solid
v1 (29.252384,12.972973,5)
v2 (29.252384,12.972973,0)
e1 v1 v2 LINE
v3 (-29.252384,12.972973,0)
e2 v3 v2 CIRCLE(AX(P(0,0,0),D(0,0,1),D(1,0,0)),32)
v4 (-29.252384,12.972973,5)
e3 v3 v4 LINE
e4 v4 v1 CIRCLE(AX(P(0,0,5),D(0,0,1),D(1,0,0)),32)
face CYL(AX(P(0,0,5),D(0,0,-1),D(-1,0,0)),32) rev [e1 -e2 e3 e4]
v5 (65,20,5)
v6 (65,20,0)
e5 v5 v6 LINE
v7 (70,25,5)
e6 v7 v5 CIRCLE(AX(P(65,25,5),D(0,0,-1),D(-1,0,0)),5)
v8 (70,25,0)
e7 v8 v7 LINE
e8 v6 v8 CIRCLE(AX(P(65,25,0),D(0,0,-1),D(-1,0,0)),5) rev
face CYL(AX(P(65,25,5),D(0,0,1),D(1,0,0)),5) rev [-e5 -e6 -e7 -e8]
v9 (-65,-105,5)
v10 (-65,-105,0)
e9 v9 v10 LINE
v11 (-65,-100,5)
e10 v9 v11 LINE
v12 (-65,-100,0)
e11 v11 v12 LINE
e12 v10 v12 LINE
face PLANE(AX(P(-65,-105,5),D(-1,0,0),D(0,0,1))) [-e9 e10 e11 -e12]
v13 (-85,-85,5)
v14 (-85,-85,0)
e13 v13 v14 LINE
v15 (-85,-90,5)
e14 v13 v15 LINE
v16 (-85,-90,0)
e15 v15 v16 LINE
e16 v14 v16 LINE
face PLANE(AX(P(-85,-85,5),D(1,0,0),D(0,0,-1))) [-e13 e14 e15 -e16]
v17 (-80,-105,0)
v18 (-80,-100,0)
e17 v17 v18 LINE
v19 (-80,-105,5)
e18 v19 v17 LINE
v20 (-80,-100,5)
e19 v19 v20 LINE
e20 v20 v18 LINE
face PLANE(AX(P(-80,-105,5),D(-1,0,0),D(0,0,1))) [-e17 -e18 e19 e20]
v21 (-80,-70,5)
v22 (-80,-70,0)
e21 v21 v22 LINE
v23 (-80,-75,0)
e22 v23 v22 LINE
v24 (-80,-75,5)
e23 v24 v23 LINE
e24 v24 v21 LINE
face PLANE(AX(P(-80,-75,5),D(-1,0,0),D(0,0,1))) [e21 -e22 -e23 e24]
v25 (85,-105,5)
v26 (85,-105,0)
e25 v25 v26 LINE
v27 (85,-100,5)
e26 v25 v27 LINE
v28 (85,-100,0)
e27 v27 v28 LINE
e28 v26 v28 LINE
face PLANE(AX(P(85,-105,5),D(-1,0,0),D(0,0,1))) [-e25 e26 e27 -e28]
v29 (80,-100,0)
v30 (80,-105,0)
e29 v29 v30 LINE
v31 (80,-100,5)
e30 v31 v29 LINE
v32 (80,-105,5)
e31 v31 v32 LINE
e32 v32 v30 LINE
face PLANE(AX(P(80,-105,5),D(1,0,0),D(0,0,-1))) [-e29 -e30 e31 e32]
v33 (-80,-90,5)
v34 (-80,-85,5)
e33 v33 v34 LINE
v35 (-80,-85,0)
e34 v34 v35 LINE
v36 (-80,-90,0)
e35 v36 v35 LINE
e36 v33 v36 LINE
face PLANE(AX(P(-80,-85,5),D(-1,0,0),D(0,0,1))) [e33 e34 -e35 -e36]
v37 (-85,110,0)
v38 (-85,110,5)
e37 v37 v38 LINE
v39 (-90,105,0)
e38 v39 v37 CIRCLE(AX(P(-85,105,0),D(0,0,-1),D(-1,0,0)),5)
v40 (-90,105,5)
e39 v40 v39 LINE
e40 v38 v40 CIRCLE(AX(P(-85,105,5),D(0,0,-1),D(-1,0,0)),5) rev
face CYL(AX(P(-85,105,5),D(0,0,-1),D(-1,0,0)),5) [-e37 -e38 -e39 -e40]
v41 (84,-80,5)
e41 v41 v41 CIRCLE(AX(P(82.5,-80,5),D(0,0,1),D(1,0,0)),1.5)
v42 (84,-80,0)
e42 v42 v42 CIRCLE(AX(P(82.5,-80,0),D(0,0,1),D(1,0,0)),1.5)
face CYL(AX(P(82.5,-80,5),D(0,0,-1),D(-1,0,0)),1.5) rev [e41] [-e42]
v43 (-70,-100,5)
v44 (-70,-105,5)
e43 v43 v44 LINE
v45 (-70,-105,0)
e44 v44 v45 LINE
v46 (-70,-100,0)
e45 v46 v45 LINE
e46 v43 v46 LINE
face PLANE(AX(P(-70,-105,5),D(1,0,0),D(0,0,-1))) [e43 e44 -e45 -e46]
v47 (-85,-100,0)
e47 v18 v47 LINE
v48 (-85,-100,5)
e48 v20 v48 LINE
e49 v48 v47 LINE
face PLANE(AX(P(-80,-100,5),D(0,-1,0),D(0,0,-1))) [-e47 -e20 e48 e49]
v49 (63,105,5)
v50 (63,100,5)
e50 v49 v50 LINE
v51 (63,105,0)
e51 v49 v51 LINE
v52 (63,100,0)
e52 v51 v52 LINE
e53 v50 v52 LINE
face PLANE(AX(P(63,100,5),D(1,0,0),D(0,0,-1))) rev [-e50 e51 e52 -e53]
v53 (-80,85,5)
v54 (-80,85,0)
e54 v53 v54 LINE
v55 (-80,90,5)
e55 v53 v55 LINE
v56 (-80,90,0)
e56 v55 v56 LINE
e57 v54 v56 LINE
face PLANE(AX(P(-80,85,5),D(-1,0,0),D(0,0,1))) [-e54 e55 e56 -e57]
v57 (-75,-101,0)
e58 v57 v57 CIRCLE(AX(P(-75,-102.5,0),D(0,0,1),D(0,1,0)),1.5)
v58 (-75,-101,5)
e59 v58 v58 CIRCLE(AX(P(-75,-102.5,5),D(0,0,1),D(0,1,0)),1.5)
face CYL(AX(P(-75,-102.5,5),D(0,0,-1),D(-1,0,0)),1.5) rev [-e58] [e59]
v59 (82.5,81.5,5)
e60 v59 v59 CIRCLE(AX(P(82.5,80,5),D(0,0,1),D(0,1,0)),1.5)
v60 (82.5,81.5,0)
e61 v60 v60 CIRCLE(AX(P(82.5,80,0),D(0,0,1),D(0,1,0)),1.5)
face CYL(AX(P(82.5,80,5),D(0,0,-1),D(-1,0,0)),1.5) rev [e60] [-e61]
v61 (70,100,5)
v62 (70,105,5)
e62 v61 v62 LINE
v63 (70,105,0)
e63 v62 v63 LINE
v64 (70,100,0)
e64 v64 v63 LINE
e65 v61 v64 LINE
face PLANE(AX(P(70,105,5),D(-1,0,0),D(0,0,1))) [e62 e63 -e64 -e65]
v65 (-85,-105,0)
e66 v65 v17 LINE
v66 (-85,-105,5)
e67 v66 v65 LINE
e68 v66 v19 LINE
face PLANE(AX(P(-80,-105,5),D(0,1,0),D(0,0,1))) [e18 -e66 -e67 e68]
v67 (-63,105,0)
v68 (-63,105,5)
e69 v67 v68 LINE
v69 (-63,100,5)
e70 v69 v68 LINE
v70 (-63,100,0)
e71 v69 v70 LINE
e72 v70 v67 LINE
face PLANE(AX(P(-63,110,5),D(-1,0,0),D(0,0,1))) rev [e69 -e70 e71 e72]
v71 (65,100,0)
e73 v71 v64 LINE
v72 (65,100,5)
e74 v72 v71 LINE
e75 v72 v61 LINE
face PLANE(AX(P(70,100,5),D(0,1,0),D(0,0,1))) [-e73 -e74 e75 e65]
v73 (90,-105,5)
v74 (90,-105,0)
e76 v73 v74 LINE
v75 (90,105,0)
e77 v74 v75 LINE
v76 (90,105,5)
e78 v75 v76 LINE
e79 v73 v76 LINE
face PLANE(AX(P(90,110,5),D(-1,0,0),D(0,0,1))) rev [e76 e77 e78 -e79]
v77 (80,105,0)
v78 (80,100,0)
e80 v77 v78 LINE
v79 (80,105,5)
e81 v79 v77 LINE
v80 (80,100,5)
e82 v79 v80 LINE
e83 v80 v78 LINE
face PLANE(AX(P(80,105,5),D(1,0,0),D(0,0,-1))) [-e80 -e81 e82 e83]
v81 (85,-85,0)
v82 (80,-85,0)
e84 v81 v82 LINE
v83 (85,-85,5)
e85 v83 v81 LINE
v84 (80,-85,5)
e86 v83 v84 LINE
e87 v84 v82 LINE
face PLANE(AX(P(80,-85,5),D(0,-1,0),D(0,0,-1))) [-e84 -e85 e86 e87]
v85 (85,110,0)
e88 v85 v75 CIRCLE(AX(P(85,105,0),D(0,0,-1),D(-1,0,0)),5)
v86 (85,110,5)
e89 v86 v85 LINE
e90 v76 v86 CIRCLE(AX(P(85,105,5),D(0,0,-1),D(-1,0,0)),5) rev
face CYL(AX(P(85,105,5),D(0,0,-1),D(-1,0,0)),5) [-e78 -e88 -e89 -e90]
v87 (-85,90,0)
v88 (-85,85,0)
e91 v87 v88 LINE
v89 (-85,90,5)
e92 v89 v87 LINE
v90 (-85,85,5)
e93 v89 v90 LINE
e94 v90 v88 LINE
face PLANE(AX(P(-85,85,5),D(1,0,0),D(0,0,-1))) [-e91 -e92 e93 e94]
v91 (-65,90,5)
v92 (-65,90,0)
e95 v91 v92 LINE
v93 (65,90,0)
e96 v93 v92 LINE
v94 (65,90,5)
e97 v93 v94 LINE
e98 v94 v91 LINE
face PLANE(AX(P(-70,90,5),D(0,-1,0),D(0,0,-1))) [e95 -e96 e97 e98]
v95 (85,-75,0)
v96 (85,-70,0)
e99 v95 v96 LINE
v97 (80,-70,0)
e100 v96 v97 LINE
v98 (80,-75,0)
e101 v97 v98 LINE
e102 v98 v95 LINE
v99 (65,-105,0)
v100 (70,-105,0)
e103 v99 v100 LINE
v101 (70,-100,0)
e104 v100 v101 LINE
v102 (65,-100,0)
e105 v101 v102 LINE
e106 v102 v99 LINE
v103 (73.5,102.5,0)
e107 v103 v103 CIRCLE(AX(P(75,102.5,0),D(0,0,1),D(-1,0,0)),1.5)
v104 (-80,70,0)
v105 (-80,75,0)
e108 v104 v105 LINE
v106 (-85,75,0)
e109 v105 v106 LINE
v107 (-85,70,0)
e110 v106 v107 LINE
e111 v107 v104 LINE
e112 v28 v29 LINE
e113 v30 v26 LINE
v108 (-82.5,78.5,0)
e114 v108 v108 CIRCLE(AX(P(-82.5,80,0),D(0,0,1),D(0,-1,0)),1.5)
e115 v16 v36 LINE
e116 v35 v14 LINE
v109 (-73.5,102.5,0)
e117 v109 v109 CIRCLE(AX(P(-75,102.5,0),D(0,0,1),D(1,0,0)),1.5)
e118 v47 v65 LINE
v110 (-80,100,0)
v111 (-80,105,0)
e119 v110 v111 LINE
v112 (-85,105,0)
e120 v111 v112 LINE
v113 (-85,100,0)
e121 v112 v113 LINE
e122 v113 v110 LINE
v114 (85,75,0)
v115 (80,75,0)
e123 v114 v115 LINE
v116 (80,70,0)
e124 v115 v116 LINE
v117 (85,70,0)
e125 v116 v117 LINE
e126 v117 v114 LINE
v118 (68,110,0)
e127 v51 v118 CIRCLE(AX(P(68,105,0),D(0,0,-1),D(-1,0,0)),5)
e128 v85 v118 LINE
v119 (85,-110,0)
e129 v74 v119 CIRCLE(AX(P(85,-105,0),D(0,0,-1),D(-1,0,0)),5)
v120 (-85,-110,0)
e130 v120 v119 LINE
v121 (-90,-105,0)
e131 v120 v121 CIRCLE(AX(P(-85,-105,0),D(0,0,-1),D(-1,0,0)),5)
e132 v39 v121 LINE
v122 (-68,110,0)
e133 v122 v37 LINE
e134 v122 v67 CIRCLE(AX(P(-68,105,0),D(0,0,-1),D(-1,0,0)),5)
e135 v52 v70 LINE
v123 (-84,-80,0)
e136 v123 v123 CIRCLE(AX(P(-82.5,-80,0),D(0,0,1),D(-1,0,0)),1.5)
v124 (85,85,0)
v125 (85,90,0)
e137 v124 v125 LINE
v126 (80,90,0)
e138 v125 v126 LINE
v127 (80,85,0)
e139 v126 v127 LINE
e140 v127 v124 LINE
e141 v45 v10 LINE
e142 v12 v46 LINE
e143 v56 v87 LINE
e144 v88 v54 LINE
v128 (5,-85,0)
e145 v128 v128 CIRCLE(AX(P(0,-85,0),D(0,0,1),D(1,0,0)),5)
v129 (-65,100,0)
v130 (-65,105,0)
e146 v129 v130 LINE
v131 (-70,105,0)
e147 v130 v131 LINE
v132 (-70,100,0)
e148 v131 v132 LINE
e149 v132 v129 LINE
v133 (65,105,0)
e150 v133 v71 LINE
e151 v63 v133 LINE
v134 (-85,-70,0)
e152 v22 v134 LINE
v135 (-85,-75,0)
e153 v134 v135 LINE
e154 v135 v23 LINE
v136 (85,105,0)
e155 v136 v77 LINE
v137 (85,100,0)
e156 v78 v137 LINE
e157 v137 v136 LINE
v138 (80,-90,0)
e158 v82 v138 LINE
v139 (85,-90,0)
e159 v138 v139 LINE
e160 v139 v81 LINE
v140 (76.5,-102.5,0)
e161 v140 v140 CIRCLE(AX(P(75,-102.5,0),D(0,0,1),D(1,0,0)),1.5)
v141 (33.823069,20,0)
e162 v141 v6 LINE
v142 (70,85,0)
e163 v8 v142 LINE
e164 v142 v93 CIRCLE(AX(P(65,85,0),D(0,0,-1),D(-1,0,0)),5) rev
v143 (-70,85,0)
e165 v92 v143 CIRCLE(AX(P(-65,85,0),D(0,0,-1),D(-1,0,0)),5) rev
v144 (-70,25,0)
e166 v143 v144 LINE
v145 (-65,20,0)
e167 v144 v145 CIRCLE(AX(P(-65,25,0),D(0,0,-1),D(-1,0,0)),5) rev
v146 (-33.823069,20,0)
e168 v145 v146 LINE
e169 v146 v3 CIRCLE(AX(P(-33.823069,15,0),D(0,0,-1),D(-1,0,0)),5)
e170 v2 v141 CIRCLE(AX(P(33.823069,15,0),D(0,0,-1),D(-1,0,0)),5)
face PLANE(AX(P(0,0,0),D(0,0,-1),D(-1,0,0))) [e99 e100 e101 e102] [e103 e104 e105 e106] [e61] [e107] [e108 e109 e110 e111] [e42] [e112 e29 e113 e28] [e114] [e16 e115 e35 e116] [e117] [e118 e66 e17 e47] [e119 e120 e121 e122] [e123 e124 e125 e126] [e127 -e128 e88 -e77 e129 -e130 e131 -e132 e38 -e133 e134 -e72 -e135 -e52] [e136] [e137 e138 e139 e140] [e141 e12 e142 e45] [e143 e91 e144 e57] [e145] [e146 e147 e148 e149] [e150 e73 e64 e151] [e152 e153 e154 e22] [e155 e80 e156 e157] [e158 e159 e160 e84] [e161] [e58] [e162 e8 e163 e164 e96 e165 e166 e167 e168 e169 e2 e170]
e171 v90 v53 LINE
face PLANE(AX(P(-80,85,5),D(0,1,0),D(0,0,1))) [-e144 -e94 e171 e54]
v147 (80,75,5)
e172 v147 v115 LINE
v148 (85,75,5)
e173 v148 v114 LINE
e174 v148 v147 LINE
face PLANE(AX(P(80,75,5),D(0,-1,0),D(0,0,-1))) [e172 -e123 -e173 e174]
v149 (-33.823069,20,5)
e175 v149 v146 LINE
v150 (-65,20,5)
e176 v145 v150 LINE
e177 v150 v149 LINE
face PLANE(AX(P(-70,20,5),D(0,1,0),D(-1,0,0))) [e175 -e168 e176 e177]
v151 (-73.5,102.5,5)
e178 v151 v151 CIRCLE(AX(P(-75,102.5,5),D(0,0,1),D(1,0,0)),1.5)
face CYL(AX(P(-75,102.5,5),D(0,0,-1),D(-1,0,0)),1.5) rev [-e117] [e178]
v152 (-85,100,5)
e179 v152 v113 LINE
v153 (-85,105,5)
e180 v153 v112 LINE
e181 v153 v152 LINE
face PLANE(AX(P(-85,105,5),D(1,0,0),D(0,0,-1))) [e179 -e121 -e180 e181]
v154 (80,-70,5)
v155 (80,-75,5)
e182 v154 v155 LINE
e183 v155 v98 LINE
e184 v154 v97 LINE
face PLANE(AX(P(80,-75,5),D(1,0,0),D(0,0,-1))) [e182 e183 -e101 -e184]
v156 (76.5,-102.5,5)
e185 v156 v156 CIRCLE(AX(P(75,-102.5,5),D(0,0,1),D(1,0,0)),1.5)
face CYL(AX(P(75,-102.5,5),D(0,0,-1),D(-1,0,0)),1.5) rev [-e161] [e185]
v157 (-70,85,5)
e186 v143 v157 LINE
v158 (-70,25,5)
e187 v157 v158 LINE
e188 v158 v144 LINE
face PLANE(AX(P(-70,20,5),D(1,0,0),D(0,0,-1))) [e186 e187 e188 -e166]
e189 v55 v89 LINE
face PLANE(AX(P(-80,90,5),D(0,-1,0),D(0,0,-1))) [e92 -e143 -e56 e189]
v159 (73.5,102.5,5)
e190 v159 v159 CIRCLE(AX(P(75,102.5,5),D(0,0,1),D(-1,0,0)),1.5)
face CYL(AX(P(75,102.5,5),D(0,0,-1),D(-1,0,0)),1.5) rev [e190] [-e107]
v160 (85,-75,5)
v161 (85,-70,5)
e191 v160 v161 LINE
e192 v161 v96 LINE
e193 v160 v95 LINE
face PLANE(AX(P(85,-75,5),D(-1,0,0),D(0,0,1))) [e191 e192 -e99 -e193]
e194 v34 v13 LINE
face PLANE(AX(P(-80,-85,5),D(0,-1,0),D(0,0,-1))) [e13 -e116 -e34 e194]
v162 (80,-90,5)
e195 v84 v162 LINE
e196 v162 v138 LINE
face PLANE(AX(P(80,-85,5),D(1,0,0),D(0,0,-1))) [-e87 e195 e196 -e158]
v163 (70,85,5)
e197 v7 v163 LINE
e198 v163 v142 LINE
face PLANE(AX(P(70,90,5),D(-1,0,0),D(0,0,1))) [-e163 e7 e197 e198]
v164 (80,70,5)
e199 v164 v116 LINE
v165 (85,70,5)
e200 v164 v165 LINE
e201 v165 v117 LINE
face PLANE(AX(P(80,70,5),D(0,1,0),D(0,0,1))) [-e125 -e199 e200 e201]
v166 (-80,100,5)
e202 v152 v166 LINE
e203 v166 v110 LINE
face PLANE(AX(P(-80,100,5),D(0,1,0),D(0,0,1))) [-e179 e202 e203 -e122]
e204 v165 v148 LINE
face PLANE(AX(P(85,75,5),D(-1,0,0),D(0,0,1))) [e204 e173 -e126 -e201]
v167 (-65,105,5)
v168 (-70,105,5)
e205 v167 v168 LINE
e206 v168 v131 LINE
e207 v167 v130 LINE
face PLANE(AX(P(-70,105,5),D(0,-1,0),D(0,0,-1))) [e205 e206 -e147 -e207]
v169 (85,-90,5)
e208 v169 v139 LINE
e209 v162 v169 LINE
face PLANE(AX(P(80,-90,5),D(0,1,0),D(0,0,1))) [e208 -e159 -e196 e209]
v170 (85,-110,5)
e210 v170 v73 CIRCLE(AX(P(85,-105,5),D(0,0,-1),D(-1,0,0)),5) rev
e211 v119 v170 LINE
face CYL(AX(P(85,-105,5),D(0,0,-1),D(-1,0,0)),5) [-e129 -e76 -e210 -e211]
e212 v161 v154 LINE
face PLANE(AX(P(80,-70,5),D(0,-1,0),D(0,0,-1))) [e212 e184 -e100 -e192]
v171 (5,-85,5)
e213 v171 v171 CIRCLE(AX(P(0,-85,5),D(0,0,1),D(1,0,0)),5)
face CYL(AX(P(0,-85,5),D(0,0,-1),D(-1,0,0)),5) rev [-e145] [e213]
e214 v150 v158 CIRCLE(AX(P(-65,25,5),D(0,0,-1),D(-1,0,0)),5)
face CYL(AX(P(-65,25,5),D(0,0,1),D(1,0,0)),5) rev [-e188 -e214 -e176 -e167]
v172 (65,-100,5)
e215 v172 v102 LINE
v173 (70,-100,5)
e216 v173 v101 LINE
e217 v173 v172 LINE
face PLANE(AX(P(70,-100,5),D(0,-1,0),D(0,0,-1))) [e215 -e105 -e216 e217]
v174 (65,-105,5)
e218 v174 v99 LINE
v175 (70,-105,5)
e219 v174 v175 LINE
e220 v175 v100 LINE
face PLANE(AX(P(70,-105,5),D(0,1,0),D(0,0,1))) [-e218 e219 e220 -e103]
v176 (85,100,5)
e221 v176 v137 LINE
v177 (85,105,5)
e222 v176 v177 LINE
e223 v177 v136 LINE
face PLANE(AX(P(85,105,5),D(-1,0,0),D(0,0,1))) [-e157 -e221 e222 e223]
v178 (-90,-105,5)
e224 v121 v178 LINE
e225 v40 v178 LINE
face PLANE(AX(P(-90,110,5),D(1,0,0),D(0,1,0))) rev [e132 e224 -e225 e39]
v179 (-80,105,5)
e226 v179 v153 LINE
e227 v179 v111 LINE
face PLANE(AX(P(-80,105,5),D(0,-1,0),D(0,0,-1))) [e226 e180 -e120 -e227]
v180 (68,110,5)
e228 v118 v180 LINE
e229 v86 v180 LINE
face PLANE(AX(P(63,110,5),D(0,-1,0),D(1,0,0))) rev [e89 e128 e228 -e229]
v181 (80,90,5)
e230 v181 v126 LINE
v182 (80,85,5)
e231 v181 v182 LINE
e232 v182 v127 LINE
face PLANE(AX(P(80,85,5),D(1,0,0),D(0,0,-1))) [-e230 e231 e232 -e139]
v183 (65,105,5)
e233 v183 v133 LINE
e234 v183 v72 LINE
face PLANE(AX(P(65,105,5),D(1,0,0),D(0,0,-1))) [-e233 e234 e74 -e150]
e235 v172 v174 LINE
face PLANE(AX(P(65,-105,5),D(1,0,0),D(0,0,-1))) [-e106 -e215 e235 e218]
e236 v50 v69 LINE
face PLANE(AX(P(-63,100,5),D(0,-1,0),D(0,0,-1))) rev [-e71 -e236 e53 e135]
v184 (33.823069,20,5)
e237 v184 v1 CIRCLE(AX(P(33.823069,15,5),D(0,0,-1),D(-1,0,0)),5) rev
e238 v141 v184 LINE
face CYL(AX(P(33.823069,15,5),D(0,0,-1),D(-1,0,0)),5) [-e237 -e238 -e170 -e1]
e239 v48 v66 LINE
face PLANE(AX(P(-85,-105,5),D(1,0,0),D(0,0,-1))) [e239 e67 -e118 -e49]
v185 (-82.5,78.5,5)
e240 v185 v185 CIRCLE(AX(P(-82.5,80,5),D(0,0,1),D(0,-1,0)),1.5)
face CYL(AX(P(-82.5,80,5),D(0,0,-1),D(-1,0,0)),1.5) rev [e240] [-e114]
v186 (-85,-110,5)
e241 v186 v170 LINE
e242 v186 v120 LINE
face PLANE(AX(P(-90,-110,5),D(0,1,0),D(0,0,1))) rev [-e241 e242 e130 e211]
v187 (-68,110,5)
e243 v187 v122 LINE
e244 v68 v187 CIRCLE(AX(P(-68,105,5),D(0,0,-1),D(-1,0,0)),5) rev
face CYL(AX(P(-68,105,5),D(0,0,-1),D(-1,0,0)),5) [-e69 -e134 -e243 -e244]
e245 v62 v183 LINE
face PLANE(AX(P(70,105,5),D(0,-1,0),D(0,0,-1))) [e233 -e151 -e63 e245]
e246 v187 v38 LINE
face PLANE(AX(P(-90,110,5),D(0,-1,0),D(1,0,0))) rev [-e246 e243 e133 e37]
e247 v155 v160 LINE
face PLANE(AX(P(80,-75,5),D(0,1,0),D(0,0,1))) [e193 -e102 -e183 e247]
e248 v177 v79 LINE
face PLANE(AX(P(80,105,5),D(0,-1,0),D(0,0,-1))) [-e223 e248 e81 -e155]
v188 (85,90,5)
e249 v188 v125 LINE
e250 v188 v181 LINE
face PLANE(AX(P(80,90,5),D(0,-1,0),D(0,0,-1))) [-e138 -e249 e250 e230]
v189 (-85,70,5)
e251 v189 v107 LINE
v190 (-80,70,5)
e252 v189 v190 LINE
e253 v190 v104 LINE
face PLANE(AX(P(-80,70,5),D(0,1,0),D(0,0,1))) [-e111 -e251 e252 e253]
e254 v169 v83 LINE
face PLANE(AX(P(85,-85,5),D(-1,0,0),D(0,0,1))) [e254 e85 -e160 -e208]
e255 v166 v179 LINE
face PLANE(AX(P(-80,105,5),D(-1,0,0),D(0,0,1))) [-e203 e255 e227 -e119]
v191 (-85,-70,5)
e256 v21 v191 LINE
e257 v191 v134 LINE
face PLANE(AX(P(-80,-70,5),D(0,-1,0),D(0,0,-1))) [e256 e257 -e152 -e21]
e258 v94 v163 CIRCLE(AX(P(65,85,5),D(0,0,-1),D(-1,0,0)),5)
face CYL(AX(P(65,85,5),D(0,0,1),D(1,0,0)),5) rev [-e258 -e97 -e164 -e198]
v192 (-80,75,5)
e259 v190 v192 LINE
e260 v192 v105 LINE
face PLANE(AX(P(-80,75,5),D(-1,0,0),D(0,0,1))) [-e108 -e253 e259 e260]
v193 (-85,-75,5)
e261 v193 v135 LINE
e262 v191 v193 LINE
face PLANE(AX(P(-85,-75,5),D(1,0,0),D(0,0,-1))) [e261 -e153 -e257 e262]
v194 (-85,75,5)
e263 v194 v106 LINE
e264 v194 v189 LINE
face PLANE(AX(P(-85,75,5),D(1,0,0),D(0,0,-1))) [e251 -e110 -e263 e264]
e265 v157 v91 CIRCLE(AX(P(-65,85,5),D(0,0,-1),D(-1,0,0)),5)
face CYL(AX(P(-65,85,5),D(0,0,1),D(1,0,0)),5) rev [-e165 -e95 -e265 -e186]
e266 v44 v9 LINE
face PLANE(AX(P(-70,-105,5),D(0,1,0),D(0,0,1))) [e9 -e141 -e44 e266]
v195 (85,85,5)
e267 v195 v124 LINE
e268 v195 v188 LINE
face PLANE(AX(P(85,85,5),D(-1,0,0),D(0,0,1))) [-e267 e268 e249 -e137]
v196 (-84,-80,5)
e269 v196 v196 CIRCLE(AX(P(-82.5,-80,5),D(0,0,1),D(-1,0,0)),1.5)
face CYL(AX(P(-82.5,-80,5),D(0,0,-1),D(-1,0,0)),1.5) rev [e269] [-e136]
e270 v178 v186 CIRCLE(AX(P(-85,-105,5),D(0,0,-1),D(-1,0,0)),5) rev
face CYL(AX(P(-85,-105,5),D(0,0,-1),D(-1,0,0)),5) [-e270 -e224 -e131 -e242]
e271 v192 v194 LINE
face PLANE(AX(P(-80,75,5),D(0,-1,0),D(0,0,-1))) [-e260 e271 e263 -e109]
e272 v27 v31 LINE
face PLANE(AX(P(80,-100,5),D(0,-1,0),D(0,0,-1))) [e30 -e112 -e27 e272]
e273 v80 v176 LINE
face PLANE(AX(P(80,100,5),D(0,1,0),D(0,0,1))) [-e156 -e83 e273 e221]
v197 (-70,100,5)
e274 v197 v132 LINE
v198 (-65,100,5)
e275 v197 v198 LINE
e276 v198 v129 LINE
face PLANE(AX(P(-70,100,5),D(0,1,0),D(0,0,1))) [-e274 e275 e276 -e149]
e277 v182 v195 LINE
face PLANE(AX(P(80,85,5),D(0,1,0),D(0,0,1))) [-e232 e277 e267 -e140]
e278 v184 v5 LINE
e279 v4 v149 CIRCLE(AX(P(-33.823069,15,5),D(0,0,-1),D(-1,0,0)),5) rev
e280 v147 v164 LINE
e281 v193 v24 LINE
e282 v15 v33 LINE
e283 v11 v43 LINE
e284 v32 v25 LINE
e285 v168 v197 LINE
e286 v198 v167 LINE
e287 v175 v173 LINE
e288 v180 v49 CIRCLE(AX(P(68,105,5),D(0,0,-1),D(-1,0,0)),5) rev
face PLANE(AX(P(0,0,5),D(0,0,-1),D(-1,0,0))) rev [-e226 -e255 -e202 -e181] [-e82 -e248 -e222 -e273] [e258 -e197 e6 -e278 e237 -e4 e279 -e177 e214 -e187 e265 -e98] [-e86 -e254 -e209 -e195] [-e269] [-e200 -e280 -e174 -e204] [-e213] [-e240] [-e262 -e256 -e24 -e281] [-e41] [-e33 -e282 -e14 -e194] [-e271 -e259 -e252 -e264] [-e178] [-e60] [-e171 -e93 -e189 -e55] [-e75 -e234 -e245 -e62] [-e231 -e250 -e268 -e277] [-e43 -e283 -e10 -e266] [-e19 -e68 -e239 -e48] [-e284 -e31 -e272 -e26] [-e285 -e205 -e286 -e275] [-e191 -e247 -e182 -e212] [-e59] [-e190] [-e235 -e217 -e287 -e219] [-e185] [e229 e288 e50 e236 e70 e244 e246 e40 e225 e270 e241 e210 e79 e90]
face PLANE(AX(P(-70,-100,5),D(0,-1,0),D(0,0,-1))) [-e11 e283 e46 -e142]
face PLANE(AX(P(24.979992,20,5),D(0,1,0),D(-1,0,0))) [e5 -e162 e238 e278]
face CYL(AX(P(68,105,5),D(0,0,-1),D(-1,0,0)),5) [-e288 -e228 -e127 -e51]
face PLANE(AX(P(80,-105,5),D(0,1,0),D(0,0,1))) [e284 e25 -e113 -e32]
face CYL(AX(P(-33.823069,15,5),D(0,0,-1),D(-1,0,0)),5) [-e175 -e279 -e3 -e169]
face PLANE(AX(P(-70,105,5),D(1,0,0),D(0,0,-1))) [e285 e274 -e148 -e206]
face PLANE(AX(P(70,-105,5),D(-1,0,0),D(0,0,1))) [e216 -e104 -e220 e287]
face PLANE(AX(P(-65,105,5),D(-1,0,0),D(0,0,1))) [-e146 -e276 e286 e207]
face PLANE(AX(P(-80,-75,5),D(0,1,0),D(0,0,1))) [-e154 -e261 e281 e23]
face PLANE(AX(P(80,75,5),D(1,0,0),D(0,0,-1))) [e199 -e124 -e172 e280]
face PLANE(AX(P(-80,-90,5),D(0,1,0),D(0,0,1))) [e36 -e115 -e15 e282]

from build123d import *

# Parameters (mm, degrees)
BOSS_EXTRUDE1_OUTLINE_W   = 5
BOSS_EXTRUDE1_OUTLINE_H   = 5
BOSS_EXTRUDE1_OUTLINE_R   = 1.5
BOSS_EXTRUDE1_OUTLINE_R_2 = 5
BOSS_EXTRUDE1_DEPTH       = 5
FILLET1_R                 = 5


# Read off the part's stored shape, not the designer's step: Boss-Extrude1
with BuildPart() as part:
    # Boss-Extrude1 outline → Boss-Extrude1 (new body)
    with BuildSketch(Plane.XY):
        Polygon((-63, 110), (-90, 110), (-90, -110), (90, -110), (90, 110), (63, 110), (63, 100), (-63, 100), align=None)
        with Locations((-82.5, -102.5)):
            Rectangle(BOSS_EXTRUDE1_OUTLINE_W, BOSS_EXTRUDE1_OUTLINE_H, mode=Mode.SUBTRACT)
        with Locations((-75, -102.5)):
            Circle(BOSS_EXTRUDE1_OUTLINE_R, mode=Mode.SUBTRACT)
        with Locations((-82.5, -87.5)):
            Rectangle(BOSS_EXTRUDE1_OUTLINE_W, BOSS_EXTRUDE1_OUTLINE_H, mode=Mode.SUBTRACT)
        with Locations((-67.5, -102.5)):
            Rectangle(BOSS_EXTRUDE1_OUTLINE_W, BOSS_EXTRUDE1_OUTLINE_H, mode=Mode.SUBTRACT)
        with Locations((-82.5, -80)):
            Circle(BOSS_EXTRUDE1_OUTLINE_R, mode=Mode.SUBTRACT)
        with Locations((-82.5, -72.5)):
            Rectangle(BOSS_EXTRUDE1_OUTLINE_W, BOSS_EXTRUDE1_OUTLINE_H, mode=Mode.SUBTRACT)
        with Locations((0, -85)):
            Circle(BOSS_EXTRUDE1_OUTLINE_R_2, mode=Mode.SUBTRACT)
        with Locations((67.5, -102.5)):
            Rectangle(BOSS_EXTRUDE1_OUTLINE_W, BOSS_EXTRUDE1_OUTLINE_H, mode=Mode.SUBTRACT)
        with Locations((75, -102.5)):
            Circle(BOSS_EXTRUDE1_OUTLINE_R, mode=Mode.SUBTRACT)
        with Locations((82.5, -102.5)):
            Rectangle(BOSS_EXTRUDE1_OUTLINE_W, BOSS_EXTRUDE1_OUTLINE_H, mode=Mode.SUBTRACT)
        with Locations((82.5, -87.5)):
            Rectangle(BOSS_EXTRUDE1_OUTLINE_W, BOSS_EXTRUDE1_OUTLINE_H, mode=Mode.SUBTRACT)
        with Locations((82.5, -80)):
            Circle(BOSS_EXTRUDE1_OUTLINE_R, mode=Mode.SUBTRACT)
        with Locations((82.5, -72.5)):
            Rectangle(BOSS_EXTRUDE1_OUTLINE_W, BOSS_EXTRUDE1_OUTLINE_H, mode=Mode.SUBTRACT)
        with Locations((-82.5, 72.5)):
            Rectangle(BOSS_EXTRUDE1_OUTLINE_W, BOSS_EXTRUDE1_OUTLINE_H, mode=Mode.SUBTRACT)
        with Locations((-82.5, 80)):
            Circle(BOSS_EXTRUDE1_OUTLINE_R, mode=Mode.SUBTRACT)
        with Locations((-82.5, 87.5)):
            Rectangle(BOSS_EXTRUDE1_OUTLINE_W, BOSS_EXTRUDE1_OUTLINE_H, mode=Mode.SUBTRACT)
        with Locations((-82.5, 102.5)):
            Rectangle(BOSS_EXTRUDE1_OUTLINE_W, BOSS_EXTRUDE1_OUTLINE_H, mode=Mode.SUBTRACT)
        with Locations((-75, 102.5)):
            Circle(BOSS_EXTRUDE1_OUTLINE_R, mode=Mode.SUBTRACT)
        with Locations((-67.5, 102.5)):
            Rectangle(BOSS_EXTRUDE1_OUTLINE_W, BOSS_EXTRUDE1_OUTLINE_H, mode=Mode.SUBTRACT)
        with BuildLine():
            Line((70, 20), (24.979991994, 20))
            ThreePointArc((24.979991994, 20), (0, -32), (-24.979991994, 20))
            Line((-24.979991994, 20), (-70, 20))
            Line((-70, 20), (-70, 90))
            Line((-70, 90), (70, 90))
            Line((70, 90), (70, 20))
        make_face(mode=Mode.SUBTRACT)
        with Locations((82.5, 72.5)):
            Rectangle(BOSS_EXTRUDE1_OUTLINE_W, BOSS_EXTRUDE1_OUTLINE_H, mode=Mode.SUBTRACT)
        with Locations((82.5, 80)):
            Circle(BOSS_EXTRUDE1_OUTLINE_R, mode=Mode.SUBTRACT)
        with Locations((82.5, 87.5)):
            Rectangle(BOSS_EXTRUDE1_OUTLINE_W, BOSS_EXTRUDE1_OUTLINE_H, mode=Mode.SUBTRACT)
        with Locations((67.5, 102.5)):
            Rectangle(BOSS_EXTRUDE1_OUTLINE_W, BOSS_EXTRUDE1_OUTLINE_H, mode=Mode.SUBTRACT)
        with Locations((75, 102.5)):
            Circle(BOSS_EXTRUDE1_OUTLINE_R, mode=Mode.SUBTRACT)
        with Locations((82.5, 102.5)):
            Rectangle(BOSS_EXTRUDE1_OUTLINE_W, BOSS_EXTRUDE1_OUTLINE_H, mode=Mode.SUBTRACT)
    extrude(amount=BOSS_EXTRUDE1_DEPTH)

    # Fillet1
    fillet1_edges = [part.edges().sort_by_distance(p)[0] for p in [
        (-63, 110, 2.5),
        (63, 110, 2.5),
        (90, 110, 2.5),
        (90, -110, 2.5),
        (-90, -110, 2.5),
        (-90, 110, 2.5),
        (-24.979991994, 20, 2.5),
        (24.979991994, 20, 2.5),
        (70, 20, 2.5),
        (70, 90, 2.5),
        (-70, 90, 2.5),
        (-70, 20, 2.5),
    ]]
    fillet(fillet1_edges, radius=FILLET1_R)


solid = part.part
